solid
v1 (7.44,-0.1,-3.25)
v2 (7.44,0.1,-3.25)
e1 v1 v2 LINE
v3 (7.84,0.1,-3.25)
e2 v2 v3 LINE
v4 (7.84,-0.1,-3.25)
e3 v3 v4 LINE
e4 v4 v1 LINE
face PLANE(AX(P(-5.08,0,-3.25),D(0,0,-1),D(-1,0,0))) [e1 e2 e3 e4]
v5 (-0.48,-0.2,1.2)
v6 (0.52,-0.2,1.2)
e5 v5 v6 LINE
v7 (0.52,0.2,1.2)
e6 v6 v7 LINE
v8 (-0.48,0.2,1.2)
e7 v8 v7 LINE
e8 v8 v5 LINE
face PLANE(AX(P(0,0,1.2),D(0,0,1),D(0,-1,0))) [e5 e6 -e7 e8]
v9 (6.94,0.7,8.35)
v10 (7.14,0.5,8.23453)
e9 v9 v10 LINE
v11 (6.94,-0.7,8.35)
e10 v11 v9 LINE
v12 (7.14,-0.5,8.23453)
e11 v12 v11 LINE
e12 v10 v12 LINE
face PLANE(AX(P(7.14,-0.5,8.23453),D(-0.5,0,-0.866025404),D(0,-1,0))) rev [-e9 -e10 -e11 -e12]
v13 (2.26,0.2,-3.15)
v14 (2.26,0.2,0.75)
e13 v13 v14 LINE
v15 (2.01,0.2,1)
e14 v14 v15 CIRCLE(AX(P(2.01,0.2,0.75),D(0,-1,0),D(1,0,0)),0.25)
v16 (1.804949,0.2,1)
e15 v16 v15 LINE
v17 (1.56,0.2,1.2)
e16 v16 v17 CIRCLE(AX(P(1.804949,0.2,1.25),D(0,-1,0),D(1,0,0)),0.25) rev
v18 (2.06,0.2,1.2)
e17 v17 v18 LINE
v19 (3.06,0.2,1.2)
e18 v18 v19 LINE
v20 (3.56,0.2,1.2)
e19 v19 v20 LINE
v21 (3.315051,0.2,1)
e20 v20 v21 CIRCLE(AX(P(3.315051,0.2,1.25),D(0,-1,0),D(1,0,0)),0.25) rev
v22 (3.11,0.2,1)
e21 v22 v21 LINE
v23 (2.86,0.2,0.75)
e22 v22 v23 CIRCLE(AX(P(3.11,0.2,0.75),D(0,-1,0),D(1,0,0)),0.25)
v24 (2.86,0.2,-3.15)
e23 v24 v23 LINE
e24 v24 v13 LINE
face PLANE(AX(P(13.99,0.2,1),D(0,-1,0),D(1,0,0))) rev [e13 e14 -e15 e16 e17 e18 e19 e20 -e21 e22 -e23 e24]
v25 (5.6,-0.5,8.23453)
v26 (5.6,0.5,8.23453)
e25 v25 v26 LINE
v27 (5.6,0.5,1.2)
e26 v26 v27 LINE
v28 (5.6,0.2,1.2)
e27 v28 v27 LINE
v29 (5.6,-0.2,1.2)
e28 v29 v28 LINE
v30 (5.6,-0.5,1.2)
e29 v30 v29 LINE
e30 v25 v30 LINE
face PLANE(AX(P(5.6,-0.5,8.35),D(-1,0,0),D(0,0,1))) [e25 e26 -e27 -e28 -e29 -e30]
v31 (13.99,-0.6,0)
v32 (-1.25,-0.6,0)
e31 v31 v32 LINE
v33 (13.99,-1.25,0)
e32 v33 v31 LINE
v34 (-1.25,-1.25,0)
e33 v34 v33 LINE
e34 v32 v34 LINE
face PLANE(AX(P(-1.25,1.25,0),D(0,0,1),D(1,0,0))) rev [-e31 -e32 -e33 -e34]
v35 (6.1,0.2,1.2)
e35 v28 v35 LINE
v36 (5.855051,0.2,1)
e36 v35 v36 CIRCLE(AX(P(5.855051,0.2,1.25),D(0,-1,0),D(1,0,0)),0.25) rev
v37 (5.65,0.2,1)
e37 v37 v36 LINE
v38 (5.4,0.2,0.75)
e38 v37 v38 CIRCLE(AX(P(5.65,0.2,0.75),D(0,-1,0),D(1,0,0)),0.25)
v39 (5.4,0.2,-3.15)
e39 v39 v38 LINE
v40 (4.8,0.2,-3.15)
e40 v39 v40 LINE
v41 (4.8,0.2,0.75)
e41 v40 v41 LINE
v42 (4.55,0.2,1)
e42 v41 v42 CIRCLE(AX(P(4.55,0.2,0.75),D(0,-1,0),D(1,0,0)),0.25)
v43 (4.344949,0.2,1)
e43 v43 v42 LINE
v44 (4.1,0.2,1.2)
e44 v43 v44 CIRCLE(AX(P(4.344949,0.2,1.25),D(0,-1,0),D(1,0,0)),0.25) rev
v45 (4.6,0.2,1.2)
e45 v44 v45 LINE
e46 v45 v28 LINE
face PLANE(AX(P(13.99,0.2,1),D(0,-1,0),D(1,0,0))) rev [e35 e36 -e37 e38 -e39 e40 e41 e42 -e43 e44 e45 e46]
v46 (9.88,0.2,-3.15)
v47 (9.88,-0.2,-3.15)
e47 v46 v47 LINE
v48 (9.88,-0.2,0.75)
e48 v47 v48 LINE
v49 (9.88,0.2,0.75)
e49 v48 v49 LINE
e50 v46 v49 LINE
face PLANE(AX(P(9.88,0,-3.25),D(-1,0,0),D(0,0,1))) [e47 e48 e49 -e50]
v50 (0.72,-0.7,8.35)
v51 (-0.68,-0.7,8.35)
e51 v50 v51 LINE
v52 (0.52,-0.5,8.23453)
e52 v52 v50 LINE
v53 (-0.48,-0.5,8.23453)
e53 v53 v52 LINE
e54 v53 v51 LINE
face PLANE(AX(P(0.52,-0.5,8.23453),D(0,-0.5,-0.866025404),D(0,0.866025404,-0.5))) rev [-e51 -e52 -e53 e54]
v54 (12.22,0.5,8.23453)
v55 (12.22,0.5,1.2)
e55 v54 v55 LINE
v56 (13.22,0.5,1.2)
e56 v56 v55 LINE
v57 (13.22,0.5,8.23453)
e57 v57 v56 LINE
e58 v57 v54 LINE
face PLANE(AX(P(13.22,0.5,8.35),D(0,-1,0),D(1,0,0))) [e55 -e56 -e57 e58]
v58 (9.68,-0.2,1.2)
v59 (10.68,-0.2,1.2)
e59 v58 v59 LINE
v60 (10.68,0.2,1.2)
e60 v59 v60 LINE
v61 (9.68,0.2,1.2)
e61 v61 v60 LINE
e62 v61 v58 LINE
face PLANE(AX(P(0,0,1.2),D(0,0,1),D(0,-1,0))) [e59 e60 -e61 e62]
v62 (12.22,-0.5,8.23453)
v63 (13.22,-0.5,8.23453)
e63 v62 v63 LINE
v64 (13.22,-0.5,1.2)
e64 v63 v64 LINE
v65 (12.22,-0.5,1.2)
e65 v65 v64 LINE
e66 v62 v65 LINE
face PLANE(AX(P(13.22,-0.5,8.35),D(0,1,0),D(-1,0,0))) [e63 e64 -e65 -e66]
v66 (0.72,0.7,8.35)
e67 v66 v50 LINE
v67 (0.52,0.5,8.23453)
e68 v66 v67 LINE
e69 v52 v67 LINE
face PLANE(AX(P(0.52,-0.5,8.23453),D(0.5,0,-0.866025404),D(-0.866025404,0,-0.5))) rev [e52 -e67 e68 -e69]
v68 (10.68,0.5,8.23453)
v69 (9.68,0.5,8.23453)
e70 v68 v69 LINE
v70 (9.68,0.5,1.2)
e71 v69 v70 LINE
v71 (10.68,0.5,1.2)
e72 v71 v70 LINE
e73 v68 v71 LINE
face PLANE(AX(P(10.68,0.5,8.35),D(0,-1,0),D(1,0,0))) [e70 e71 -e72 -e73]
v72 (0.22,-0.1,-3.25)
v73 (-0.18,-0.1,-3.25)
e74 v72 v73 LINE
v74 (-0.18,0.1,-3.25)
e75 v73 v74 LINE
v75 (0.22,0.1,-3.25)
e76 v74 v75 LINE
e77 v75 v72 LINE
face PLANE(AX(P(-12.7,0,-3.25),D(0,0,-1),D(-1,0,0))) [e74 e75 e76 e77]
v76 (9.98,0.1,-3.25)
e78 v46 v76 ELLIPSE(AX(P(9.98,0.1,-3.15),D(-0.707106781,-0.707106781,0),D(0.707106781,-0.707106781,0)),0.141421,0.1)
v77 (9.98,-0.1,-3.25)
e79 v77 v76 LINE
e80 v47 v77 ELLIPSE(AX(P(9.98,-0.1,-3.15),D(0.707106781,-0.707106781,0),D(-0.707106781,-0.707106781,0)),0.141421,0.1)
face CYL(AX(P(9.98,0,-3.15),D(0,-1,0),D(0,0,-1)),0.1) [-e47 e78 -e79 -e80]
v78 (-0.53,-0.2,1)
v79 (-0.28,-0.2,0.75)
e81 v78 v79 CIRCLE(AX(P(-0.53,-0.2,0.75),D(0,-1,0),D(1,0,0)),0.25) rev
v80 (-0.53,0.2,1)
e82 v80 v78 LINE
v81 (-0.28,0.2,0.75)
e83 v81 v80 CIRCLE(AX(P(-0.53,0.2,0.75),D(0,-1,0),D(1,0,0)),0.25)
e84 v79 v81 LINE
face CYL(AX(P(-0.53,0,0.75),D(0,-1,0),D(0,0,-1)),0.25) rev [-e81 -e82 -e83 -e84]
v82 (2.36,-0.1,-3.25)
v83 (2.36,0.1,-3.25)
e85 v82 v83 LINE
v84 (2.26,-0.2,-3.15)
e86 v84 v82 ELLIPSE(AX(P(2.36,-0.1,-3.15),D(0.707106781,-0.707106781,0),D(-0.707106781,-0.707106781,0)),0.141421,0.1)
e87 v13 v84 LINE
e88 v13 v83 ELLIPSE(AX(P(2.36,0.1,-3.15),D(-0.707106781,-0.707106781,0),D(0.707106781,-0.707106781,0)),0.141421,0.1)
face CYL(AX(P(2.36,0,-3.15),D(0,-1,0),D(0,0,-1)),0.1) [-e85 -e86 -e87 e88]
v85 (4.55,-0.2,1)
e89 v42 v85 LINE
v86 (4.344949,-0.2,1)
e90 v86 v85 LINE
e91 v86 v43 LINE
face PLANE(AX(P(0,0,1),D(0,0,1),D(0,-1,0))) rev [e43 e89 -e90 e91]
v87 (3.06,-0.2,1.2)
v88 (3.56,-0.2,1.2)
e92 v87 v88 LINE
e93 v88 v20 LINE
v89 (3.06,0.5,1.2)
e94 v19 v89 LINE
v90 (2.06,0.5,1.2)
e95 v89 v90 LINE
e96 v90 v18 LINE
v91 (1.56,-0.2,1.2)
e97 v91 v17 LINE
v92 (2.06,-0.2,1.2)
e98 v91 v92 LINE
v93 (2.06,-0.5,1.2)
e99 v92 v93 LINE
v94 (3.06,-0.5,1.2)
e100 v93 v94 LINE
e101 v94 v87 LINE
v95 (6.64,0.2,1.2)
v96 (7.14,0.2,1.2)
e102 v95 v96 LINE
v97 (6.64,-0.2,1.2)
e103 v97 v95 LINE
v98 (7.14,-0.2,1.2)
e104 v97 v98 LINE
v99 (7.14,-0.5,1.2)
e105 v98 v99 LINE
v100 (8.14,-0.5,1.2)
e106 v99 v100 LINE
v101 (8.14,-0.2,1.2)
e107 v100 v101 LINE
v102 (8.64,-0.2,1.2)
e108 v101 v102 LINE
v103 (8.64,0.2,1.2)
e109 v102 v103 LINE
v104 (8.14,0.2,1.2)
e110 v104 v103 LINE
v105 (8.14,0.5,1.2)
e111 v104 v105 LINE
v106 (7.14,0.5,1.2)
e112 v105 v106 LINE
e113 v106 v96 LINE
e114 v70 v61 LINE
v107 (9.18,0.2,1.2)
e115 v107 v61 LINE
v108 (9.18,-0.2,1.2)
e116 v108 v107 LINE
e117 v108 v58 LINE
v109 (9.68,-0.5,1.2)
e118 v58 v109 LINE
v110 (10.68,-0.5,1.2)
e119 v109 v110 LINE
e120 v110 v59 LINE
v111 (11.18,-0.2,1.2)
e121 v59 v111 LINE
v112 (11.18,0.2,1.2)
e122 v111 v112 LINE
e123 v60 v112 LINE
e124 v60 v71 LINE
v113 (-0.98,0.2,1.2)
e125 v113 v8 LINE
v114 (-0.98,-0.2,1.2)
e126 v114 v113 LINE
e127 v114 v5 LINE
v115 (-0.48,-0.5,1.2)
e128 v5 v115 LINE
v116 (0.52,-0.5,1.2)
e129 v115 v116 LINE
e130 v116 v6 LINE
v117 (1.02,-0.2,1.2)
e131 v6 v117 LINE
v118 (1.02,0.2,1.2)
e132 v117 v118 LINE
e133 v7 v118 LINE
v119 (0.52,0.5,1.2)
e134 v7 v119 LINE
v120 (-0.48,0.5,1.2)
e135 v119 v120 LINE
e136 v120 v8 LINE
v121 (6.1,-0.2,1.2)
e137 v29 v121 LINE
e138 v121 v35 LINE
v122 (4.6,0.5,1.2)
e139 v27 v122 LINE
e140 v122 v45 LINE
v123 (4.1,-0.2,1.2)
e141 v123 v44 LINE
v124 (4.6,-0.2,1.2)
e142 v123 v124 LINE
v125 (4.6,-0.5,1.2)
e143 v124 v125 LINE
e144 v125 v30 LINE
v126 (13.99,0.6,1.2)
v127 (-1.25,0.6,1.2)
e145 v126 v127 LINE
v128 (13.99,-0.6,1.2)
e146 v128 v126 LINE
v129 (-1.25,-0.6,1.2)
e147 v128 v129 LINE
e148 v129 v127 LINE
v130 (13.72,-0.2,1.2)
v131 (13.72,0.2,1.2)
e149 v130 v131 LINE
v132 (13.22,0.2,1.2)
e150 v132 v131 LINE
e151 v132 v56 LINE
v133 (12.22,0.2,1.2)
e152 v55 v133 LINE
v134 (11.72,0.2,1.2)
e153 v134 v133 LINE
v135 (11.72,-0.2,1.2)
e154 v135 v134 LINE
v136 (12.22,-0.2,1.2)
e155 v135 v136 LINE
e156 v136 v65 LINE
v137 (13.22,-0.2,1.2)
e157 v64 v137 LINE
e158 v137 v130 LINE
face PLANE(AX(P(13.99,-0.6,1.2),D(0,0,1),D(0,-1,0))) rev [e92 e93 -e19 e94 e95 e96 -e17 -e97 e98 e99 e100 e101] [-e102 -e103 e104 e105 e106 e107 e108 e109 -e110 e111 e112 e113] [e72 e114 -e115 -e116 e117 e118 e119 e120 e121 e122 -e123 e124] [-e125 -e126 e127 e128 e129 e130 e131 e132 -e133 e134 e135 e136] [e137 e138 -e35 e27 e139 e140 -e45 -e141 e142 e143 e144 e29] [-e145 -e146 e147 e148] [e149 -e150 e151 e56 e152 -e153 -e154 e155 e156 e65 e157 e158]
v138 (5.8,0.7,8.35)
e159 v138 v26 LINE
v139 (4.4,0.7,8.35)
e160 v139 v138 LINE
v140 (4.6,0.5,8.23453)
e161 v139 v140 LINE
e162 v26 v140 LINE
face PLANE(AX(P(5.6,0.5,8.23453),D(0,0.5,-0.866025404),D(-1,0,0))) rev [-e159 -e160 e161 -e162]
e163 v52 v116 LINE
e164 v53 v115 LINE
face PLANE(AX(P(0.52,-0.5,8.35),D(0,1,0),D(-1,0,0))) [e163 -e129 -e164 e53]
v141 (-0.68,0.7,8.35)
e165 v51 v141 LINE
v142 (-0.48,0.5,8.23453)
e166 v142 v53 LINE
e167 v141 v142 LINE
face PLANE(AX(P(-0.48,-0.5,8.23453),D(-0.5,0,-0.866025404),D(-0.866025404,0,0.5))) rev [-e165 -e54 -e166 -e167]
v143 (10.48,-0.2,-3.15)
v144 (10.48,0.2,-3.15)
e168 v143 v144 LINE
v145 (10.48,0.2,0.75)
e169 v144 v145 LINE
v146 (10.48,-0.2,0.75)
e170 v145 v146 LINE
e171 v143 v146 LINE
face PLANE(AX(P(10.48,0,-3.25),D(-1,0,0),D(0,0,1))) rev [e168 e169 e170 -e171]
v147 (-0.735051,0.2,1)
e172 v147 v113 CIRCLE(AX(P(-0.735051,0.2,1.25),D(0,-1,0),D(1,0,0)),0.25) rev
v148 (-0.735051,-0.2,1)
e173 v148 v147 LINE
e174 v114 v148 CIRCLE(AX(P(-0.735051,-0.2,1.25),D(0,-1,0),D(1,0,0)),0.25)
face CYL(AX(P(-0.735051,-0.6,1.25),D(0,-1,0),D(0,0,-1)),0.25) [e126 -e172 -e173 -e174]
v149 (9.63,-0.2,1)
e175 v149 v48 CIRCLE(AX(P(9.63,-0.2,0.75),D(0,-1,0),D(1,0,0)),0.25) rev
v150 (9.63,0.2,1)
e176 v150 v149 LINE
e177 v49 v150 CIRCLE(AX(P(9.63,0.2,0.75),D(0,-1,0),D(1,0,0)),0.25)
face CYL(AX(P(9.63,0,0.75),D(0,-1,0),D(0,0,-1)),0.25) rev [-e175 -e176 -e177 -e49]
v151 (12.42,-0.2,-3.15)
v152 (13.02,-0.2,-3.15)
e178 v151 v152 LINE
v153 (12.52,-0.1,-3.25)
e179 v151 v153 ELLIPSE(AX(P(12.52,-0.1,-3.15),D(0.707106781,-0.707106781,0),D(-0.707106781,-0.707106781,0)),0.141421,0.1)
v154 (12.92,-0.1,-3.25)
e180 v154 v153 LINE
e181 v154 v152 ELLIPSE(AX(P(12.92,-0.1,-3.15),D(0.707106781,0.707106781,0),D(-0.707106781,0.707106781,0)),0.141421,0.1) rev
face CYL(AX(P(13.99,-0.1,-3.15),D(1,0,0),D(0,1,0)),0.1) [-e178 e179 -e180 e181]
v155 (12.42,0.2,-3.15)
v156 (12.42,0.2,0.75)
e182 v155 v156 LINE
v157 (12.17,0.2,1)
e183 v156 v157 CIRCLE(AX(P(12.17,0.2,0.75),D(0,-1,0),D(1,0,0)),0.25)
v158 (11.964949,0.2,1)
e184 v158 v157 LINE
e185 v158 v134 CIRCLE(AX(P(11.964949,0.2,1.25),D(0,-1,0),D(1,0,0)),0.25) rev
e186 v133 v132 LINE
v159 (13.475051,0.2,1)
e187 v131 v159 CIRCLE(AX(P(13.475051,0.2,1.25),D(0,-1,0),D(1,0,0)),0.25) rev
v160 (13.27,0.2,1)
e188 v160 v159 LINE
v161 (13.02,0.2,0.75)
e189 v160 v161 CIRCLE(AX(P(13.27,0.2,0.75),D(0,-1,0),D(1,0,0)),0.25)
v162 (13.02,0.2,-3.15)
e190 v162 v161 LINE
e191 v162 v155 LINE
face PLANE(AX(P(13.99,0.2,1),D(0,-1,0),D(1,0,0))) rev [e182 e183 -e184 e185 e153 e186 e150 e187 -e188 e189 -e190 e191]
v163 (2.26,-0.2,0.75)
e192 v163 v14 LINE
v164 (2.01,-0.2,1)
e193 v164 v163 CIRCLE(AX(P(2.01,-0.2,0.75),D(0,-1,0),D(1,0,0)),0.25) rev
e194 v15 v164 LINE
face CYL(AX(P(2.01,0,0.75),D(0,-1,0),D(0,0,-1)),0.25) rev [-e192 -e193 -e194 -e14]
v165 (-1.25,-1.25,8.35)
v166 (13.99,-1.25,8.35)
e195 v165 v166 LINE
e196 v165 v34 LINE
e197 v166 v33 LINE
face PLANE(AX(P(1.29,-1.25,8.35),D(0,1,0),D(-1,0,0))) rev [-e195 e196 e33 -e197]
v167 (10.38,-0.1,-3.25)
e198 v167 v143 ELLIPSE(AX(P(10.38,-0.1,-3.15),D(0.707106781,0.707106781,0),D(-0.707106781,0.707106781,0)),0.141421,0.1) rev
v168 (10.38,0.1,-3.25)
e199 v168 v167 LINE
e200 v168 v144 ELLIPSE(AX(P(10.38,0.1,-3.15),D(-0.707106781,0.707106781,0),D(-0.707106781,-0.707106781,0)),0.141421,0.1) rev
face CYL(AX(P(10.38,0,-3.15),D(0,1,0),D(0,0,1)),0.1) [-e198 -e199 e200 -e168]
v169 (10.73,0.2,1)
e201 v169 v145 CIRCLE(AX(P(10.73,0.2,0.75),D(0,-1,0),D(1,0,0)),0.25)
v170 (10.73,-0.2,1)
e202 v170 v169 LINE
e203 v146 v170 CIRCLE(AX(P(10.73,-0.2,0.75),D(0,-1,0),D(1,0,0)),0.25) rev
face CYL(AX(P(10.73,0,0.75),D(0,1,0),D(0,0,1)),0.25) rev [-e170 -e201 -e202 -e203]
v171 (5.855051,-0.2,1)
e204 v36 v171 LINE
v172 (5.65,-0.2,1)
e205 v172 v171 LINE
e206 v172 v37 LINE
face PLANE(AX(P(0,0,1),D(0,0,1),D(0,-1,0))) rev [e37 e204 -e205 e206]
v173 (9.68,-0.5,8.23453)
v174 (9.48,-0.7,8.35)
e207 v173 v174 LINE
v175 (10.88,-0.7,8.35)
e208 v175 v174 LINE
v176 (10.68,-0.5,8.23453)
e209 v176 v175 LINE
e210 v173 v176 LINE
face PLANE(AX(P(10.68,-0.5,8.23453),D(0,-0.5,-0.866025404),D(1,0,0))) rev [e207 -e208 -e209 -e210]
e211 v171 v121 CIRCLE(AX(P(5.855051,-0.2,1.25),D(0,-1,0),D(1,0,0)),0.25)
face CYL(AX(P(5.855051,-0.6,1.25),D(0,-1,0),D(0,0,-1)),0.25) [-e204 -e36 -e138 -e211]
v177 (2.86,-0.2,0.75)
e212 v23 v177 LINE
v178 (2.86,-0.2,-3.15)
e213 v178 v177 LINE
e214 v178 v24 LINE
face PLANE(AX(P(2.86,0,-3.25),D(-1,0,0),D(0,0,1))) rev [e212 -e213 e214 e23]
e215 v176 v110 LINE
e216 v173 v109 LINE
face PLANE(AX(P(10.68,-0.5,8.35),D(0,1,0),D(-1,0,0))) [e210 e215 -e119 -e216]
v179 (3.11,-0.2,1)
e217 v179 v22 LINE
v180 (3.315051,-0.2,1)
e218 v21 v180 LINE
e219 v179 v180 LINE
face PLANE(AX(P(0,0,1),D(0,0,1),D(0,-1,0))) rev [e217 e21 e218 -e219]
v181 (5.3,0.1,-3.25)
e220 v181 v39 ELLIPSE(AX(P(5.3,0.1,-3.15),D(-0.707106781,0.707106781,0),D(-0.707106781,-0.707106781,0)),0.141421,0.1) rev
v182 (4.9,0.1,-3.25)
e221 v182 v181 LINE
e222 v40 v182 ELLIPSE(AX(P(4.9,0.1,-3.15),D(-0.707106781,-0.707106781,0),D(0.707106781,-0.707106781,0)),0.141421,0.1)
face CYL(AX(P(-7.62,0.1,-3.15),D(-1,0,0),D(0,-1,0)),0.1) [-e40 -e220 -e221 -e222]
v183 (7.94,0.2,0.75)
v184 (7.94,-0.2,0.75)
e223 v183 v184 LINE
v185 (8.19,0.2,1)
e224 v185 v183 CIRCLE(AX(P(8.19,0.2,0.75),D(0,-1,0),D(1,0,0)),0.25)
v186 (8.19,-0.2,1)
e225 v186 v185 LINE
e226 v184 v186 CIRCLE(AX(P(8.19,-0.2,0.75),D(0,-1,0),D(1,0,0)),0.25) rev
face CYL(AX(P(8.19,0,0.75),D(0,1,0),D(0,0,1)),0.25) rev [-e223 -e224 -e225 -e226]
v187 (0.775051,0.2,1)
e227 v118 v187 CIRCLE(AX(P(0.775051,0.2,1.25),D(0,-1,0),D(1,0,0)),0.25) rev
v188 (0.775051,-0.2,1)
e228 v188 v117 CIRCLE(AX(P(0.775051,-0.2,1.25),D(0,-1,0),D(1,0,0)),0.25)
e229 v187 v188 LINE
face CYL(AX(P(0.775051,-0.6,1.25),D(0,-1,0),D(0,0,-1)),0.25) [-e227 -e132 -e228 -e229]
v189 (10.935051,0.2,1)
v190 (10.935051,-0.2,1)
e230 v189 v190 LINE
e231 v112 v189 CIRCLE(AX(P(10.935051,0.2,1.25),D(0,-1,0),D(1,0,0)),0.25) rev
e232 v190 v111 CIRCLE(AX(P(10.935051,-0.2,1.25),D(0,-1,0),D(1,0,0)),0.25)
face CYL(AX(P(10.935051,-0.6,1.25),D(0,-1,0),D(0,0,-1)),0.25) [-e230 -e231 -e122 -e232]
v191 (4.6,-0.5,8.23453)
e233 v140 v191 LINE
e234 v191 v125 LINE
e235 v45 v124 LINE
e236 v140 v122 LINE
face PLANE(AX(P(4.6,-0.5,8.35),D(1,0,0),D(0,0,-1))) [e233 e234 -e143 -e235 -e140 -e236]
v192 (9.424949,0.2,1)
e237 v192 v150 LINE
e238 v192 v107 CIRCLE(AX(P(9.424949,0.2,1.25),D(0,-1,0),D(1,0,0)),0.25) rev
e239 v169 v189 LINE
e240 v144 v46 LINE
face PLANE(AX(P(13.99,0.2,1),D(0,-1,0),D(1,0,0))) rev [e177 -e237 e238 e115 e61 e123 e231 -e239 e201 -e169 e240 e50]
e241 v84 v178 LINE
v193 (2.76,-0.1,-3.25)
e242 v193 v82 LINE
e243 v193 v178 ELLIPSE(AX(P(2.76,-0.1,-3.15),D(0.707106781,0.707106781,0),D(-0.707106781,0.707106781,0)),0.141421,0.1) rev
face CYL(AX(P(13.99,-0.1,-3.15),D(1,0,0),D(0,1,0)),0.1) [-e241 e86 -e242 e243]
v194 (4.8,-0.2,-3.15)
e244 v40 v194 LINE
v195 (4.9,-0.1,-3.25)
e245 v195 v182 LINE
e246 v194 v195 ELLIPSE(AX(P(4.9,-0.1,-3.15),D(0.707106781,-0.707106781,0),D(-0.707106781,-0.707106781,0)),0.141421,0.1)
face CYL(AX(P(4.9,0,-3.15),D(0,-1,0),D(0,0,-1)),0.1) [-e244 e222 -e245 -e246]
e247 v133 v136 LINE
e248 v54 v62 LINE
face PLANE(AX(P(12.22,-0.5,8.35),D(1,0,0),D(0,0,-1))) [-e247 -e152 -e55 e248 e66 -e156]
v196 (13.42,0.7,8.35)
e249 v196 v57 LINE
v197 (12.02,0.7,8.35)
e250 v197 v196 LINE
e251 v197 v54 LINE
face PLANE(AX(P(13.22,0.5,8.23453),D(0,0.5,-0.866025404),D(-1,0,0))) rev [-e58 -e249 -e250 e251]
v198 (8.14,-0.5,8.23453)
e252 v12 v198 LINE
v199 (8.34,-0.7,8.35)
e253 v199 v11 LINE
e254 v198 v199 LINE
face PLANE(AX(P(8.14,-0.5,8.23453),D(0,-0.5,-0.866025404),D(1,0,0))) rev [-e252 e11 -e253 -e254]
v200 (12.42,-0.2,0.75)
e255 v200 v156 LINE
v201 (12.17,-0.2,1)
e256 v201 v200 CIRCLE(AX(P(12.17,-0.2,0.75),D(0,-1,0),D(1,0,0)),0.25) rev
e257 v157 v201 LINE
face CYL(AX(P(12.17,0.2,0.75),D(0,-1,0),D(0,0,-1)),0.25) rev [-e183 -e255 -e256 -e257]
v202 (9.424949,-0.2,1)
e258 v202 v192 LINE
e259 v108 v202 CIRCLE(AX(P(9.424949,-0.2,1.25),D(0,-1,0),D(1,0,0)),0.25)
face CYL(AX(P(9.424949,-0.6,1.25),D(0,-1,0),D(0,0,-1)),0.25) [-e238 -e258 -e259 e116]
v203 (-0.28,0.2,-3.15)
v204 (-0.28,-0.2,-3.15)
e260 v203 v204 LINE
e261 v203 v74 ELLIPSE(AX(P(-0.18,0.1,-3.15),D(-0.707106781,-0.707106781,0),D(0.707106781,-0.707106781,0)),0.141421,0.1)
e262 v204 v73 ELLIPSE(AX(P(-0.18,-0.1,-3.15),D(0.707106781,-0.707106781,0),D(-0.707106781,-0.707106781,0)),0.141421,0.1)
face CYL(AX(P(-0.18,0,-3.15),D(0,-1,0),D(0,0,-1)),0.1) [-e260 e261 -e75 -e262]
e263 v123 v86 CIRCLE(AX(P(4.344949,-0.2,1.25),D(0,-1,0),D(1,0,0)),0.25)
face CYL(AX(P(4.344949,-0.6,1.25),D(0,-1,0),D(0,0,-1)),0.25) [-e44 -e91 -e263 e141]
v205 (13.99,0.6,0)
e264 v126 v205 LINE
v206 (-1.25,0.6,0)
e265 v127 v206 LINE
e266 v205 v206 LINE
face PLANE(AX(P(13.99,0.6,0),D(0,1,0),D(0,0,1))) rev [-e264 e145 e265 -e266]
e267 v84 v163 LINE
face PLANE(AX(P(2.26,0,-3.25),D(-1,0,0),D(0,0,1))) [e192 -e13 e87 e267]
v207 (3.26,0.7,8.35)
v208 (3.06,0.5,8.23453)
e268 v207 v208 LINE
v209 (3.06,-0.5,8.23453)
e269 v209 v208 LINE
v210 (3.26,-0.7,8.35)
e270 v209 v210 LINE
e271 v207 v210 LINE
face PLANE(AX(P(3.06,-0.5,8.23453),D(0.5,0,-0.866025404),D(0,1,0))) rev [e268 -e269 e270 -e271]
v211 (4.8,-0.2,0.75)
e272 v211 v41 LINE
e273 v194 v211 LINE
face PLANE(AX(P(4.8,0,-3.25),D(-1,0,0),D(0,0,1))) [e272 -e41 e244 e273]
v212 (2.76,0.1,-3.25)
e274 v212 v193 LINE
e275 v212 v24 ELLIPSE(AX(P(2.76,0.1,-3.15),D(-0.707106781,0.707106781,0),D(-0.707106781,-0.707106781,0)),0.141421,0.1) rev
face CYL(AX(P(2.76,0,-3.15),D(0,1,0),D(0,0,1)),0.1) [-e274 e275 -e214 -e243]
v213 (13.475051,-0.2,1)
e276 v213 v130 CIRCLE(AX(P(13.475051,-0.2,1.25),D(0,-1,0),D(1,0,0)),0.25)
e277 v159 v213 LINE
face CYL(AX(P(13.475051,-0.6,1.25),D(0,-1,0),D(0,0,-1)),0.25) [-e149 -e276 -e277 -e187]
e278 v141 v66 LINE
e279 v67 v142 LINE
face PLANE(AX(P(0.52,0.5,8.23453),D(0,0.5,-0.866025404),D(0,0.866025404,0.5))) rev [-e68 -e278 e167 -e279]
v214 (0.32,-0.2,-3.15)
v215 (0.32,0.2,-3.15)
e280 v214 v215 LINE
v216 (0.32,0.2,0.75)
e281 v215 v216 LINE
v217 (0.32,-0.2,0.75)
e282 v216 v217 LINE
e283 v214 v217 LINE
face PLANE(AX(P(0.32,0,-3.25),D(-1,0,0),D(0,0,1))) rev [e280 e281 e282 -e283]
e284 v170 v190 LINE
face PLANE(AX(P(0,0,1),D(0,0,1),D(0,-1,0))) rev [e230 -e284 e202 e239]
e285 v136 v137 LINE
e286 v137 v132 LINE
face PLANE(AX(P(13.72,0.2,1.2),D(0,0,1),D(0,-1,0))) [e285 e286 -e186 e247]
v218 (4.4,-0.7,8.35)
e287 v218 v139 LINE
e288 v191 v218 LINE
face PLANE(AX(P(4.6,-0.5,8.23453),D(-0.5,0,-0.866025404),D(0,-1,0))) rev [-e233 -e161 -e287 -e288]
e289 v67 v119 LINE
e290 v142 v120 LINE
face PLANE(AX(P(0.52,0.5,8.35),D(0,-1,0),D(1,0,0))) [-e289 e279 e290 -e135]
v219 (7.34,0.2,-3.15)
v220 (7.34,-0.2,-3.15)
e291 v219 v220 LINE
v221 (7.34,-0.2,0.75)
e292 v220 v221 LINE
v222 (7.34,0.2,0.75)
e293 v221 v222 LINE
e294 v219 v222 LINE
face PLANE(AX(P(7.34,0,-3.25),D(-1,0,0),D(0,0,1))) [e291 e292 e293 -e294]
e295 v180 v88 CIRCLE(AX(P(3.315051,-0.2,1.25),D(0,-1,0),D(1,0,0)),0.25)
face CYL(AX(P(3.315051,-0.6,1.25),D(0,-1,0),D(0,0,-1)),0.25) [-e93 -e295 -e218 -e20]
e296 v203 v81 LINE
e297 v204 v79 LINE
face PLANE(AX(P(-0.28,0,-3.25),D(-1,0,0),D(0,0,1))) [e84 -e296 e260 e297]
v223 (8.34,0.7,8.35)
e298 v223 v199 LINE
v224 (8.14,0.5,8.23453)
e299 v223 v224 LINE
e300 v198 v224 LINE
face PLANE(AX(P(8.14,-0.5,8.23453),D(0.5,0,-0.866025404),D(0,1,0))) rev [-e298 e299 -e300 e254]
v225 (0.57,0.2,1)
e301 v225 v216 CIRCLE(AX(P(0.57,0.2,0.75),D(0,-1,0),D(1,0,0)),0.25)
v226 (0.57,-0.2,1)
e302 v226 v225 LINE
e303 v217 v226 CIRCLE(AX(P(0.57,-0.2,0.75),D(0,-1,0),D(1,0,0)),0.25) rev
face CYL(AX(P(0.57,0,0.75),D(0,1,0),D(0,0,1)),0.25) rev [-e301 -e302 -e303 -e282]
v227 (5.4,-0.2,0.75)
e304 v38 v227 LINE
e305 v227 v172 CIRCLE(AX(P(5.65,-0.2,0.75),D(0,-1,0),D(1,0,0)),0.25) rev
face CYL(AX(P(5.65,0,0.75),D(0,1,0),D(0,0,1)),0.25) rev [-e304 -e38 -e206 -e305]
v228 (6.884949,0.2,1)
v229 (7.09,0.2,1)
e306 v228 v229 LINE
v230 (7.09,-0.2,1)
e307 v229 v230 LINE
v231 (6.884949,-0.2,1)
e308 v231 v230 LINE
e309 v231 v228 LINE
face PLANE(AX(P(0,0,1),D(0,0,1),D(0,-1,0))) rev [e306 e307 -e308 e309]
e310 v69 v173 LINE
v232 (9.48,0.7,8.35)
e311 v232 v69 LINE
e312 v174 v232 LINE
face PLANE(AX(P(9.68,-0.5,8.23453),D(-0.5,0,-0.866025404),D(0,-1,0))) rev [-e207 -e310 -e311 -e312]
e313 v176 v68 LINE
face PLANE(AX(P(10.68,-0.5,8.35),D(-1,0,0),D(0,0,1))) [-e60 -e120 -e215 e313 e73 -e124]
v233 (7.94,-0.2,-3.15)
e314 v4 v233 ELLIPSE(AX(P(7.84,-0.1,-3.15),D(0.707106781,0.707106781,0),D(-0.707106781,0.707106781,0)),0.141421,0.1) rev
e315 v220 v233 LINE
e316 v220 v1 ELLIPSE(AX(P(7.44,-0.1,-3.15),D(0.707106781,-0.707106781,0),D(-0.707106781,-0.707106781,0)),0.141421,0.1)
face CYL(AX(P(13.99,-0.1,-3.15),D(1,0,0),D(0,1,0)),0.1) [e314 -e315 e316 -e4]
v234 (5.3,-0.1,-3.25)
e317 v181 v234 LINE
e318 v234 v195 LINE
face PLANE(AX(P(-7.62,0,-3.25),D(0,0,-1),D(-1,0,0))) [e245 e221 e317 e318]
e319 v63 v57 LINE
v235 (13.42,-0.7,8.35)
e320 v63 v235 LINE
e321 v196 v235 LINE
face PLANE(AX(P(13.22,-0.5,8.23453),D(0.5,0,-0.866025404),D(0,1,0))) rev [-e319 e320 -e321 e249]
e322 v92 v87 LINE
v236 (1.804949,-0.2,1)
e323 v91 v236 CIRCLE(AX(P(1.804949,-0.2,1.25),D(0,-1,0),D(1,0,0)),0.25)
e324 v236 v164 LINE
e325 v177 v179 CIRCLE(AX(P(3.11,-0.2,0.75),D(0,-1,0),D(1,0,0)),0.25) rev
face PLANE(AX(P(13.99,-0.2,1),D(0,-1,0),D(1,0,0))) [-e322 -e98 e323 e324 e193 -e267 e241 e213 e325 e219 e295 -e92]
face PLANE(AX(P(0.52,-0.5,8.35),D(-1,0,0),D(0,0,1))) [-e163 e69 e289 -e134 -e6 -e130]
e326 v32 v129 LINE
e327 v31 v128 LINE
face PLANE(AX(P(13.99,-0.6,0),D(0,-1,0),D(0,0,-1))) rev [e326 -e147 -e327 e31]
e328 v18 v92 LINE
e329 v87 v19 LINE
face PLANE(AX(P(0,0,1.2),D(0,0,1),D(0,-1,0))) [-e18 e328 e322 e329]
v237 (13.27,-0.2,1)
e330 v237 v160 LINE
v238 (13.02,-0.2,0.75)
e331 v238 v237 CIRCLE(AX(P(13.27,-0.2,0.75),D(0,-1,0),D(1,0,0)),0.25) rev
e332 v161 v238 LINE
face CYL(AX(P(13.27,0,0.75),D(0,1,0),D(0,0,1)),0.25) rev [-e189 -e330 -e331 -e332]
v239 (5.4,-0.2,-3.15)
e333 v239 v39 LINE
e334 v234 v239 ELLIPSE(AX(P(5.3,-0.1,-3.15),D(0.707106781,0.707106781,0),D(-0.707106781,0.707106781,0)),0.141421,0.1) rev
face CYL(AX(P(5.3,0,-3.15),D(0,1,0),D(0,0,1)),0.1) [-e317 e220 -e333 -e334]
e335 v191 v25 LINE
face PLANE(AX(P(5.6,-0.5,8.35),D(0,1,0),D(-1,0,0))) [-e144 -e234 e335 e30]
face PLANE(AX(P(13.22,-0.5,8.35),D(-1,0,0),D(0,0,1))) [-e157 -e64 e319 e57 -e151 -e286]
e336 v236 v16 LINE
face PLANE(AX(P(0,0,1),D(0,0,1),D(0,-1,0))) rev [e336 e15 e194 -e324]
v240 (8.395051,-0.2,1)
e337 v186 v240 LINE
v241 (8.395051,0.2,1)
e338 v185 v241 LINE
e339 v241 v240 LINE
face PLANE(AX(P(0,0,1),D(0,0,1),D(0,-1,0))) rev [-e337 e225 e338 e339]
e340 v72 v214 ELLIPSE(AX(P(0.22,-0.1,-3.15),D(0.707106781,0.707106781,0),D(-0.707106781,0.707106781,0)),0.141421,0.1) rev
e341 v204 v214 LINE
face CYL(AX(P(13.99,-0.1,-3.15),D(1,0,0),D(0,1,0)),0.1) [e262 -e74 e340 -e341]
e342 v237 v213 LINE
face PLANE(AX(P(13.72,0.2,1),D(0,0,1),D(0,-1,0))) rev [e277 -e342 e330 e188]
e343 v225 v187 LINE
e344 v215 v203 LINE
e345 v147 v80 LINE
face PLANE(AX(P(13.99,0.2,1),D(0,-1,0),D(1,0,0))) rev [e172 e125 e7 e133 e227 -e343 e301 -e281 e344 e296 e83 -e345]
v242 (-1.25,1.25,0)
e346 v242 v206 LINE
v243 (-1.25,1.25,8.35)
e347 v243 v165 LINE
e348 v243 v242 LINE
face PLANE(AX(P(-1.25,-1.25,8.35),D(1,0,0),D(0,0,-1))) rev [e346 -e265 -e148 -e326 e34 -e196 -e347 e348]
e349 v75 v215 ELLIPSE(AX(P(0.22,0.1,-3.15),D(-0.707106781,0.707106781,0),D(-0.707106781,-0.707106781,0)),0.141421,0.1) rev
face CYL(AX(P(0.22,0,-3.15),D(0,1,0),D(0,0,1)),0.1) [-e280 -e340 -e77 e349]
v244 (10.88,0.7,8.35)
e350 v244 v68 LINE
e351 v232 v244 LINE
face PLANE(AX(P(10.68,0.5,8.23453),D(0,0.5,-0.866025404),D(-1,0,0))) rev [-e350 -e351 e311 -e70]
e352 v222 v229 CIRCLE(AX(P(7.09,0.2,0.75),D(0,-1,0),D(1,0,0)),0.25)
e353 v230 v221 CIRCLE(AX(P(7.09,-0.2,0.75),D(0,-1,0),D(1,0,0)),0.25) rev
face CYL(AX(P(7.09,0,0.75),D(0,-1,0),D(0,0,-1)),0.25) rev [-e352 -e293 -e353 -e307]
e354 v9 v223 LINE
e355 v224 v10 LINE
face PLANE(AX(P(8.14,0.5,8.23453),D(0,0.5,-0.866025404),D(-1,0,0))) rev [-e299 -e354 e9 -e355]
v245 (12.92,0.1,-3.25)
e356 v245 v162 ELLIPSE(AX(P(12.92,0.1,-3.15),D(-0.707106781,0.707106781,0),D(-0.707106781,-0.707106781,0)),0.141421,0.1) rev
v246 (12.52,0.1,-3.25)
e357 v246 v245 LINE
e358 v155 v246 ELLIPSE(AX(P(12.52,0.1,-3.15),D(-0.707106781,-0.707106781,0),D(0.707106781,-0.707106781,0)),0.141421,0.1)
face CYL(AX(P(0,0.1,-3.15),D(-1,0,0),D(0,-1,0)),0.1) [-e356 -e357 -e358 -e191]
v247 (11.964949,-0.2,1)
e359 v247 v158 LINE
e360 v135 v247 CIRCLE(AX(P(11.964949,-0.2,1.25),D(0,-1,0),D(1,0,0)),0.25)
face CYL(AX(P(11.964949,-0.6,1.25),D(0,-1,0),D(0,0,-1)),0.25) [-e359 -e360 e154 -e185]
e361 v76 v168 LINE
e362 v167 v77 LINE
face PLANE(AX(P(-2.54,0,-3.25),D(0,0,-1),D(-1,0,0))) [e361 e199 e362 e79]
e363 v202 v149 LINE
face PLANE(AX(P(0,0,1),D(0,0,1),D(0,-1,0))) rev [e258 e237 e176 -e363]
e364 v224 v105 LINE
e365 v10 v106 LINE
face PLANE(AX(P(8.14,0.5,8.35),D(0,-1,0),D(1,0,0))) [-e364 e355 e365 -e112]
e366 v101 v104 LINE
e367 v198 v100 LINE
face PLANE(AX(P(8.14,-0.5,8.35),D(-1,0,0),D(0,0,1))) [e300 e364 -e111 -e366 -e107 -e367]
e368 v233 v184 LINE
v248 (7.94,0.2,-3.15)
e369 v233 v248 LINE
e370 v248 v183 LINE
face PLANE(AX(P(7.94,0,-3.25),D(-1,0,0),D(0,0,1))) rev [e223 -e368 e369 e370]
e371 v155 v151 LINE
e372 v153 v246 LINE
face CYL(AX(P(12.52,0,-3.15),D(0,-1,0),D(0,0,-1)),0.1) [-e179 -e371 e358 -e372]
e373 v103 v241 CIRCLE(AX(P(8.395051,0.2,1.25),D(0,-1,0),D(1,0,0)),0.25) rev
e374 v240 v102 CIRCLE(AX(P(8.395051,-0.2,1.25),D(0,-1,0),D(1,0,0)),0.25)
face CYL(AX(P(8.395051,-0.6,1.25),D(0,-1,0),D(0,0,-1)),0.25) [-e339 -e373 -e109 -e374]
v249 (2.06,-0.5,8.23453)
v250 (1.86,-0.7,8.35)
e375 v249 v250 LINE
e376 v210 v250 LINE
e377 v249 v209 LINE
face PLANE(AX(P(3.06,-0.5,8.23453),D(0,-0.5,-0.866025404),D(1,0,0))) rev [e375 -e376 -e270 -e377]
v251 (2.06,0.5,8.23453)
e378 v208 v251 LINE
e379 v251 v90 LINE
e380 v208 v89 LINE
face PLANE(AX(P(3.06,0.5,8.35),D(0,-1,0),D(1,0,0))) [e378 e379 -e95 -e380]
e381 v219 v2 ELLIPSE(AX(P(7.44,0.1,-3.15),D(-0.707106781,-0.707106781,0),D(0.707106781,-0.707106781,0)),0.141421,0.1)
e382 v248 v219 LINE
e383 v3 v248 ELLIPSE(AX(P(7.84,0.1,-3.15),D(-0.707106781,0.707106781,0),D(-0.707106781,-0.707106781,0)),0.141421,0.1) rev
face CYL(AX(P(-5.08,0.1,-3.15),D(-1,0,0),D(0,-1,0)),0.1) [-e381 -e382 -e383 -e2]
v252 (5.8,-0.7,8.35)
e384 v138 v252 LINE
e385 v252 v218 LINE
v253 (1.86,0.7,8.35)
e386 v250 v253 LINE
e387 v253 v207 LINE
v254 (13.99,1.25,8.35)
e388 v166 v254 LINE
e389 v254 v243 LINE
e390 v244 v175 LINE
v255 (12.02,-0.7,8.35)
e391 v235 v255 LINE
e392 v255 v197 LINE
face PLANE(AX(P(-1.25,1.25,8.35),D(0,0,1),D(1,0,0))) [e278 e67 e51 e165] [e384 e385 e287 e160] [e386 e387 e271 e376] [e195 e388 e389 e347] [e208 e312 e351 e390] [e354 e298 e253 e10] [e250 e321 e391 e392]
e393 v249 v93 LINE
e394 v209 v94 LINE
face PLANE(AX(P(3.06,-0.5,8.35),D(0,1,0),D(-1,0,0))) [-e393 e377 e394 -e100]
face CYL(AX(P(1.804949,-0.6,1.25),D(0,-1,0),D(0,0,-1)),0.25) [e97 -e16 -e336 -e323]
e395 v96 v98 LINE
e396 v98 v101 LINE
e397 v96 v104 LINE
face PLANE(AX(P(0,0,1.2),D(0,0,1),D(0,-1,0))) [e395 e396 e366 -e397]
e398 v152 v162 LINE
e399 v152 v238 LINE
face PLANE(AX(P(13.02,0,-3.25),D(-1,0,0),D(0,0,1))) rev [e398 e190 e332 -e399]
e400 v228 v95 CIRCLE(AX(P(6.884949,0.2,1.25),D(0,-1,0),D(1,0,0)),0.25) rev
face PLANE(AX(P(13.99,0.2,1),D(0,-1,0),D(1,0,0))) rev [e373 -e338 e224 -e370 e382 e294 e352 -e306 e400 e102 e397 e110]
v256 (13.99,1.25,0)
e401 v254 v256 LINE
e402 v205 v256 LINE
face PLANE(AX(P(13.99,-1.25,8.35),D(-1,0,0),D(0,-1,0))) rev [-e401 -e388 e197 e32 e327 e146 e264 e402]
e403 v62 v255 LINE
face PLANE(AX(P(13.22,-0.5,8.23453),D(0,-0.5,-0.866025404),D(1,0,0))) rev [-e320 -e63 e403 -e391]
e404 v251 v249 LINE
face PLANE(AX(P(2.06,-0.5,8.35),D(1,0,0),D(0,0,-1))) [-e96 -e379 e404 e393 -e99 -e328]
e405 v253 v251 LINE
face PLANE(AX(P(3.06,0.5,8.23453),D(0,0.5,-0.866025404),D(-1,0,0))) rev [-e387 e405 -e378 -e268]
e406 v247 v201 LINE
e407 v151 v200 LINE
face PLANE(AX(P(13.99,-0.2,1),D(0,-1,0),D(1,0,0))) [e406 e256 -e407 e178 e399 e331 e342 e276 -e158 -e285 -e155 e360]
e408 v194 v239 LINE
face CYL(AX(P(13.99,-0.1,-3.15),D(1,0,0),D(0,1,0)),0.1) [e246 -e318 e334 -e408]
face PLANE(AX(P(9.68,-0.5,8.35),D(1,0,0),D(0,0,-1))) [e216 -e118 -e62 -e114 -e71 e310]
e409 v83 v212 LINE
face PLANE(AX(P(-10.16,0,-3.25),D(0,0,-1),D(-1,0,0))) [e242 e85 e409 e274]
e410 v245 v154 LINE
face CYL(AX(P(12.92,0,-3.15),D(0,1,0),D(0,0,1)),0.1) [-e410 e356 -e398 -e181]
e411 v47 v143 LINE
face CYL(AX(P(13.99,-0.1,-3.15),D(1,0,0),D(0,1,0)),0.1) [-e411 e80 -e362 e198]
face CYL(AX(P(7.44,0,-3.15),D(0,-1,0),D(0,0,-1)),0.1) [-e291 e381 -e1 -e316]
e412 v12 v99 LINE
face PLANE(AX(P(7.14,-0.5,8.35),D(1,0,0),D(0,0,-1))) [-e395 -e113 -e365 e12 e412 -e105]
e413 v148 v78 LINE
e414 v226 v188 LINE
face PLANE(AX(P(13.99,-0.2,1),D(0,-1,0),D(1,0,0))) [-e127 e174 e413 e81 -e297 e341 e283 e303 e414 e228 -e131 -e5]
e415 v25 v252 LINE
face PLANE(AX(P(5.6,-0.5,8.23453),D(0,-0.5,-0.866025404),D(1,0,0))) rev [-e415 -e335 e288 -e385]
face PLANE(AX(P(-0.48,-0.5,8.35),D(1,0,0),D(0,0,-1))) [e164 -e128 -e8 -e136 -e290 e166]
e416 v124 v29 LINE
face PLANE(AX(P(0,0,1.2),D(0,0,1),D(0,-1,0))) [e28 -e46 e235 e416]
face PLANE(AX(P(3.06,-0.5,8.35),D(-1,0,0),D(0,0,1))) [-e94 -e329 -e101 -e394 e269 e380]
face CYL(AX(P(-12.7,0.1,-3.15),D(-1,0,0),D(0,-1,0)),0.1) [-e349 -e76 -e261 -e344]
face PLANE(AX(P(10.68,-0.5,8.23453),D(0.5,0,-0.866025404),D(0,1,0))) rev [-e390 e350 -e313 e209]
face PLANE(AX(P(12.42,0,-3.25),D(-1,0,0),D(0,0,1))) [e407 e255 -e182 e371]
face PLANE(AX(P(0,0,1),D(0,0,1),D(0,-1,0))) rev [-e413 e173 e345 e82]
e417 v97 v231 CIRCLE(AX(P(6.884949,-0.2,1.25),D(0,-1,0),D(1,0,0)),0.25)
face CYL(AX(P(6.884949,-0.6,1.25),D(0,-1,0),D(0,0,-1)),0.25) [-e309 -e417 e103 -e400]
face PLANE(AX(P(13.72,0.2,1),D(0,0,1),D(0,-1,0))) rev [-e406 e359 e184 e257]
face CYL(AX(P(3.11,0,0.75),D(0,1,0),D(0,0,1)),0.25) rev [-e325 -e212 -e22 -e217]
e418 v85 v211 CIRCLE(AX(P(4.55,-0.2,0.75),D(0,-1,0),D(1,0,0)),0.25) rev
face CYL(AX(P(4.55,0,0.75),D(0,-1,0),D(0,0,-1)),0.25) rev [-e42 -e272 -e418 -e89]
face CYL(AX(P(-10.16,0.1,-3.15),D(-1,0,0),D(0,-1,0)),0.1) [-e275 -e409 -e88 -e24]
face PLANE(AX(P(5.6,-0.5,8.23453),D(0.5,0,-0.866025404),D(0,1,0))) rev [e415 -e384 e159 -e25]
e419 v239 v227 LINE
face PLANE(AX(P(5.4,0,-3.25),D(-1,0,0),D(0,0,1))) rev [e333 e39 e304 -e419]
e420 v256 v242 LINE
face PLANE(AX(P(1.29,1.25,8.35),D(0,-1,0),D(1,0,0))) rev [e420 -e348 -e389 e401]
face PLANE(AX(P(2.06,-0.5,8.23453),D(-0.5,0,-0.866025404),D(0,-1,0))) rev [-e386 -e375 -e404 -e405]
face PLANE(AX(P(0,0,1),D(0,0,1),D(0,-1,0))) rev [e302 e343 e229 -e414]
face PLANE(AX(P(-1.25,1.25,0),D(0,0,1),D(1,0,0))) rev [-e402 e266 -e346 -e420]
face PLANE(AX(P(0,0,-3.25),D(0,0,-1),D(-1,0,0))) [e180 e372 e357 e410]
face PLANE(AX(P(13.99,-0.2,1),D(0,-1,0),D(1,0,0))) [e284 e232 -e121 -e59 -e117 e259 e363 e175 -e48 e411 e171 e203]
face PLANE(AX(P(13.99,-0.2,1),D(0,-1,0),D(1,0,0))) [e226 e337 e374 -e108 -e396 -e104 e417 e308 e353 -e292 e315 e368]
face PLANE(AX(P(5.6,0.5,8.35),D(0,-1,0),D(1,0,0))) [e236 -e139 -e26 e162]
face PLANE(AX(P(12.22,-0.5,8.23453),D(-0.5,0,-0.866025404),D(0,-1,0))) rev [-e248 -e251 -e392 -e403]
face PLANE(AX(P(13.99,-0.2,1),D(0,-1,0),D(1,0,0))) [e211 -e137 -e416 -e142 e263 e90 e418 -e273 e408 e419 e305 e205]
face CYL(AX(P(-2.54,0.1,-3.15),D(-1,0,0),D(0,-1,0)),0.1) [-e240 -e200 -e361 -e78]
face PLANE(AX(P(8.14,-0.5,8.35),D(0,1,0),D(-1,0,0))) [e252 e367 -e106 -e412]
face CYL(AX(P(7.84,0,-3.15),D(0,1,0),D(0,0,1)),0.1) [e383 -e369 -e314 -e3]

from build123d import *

# Parameters (mm, degrees)
SKETCH1_W                   = 2.54
SKETCH1_H                   = 2.5
SKETCH1_W_2                 = 1
SKETCH1_H_2                 = 1
BOSS_EXTRUDE1_DEPTH         = 8.35
CHAMFER1_SIZE               = 0.2
CHAMFER1_SIZE2              = 0.115470054
LPATTERN2_COUNT             = 6
LPATTERN2_PITCH             = 2.54
CHAMFER1_OF_LPATTERN2_SIZE2 = 0.115470054
CHAMFER1_OF_LPATTERN2_SIZE  = 0.2
SKETCH4_W                   = 1.2
SKETCH4_H                   = 1.2
CUT_EXTRUDE1_DEPTH          = 18.422473992
SKETCH3_W                   = 0.7
SKETCH3_H                   = 0.4
SKETCH3_W_2                 = 0.6
BOSS_EXTRUDE2_DEPTH         = 0.2
SKETCH3_3_W                 = 0.6
SKETCH3_3_H                 = 0.4
BOSS_EXTRUDE3_DEPTH         = 4.45
FILLET1_R                   = 0.1
FILLET2_R                   = 0.25
LPATTERN3_START             = -0.2
LPATTERN3_DEPTH             = 0.4
LPATTERN3_START_2           = -1
LPATTERN3_2_DEPTH           = 12


with BuildPart() as part:
    # Sketch1 → Boss-Extrude1 (new body)
    with BuildSketch(Plane.XY):
        with Locations((0.02, 0)):
            Rectangle(SKETCH1_W, SKETCH1_H)
        with Locations((0.02, 0)):
            Rectangle(SKETCH1_W_2, SKETCH1_H_2, mode=Mode.SUBTRACT)
    boss_extrude1 = extrude(amount=BOSS_EXTRUDE1_DEPTH)

    # Chamfer1
    chamfer1_edges = [part.edges().sort_by_distance(p)[0] for p in [
        (-0.48, 0, 8.35),
        (0.02, -0.5, 8.35),
        (0.52, 0, 8.35),
        (0.02, 0.5, 8.35),
    ]]
    chamfer1_side = [part.faces().sort_by_distance(p)[0] for p in [
        (0.02, -1.214360696, 8.35),
    ]]
    chamfer(chamfer1_edges, length=CHAMFER1_SIZE, length2=CHAMFER1_SIZE2, reference=chamfer1_side[0])

    # LPattern2: Boss-Extrude1 ×6
    with Locations(*[(i * LPATTERN2_PITCH, 0, 0) for i in range(1, LPATTERN2_COUNT)]):
        add(boss_extrude1)

    # Chamfer1 of LPattern2
    chamfer1_of_lpattern2_edges = [part.edges().sort_by_distance(p)[0] for p in [
        (2.06, 0, 8.35),
        (2.56, -0.5, 8.35),
        (3.06, 0, 8.35),
        (2.56, 0.5, 8.35),
        (4.6, 0, 8.35),
        (5.1, -0.5, 8.35),
        (5.6, 0, 8.35),
        (5.1, 0.5, 8.35),
        (7.14, 0, 8.35),
        (7.64, -0.5, 8.35),
        (8.14, 0, 8.35),
        (7.64, 0.5, 8.35),
        (9.68, 0, 8.35),
        (10.18, -0.5, 8.35),
        (10.68, 0, 8.35),
        (10.18, 0.5, 8.35),
        (12.22, 0, 8.35),
        (12.72, -0.5, 8.35),
        (13.22, 0, 8.35),
        (12.72, 0.5, 8.35),
    ]]
    chamfer(chamfer1_of_lpattern2_edges, length=CHAMFER1_OF_LPATTERN2_SIZE, length2=CHAMFER1_OF_LPATTERN2_SIZE2)

    # Sketch4 → Cut-Extrude1 (cut, through all)
    with BuildSketch(Plane.ZY.offset(1.25)):
        with Locations((0.6, 0)):
            Rectangle(SKETCH4_W, SKETCH4_H)
    extrude(amount=-CUT_EXTRUDE1_DEPTH, mode=Mode.SUBTRACT)

    # Sketch3 → Boss-Extrude2 (add)
    with BuildSketch(Plane(origin=(0, 0, 1.2), x_dir=(-1, 0, 0), z_dir=(0, 0, -1))):
        with Locations((-13.37, 0)):
            Rectangle(SKETCH3_W, SKETCH3_H)
        with Locations((-12.07, 0)):
            Rectangle(SKETCH3_W, SKETCH3_H)
        with Locations((-12.72, 0)):
            Rectangle(SKETCH3_W_2, SKETCH3_H)
    extrude(amount=BOSS_EXTRUDE2_DEPTH)

    # Sketch3<3> → Boss-Extrude3 (add)
    with BuildSketch(Plane(origin=(0, 0, 1.2), x_dir=(-1, 0, 0), z_dir=(0, 0, -1))):
        with Locations((-12.72, 0)):
            Rectangle(SKETCH3_3_W, SKETCH3_3_H)
    extrude(amount=BOSS_EXTRUDE3_DEPTH)

    # Fillet1
    fillet1_edges = [part.edges().sort_by_distance(p)[0] for p in [
        (12.42, 0, -3.25),
        (12.72, -0.2, -3.25),
        (12.72, 0.2, -3.25),
        (13.02, 0, -3.25),
    ]]
    fillet(fillet1_edges, radius=FILLET1_R)

    # Fillet2
    # the kernel refuses this fillet: 0.25 mm, written as the material it adds along each edge
    with BuildSketch(Plane(origin=(13.02, -0.2, 1), x_dir=(0, 0, -1), z_dir=(0, 1, 0)), Plane(origin=(12.42, 0.2, 1), x_dir=(0, 0, -1), z_dir=(0, -1, 0))) as fillet2_piece_1:
        with BuildLine():
            CenterArc((FILLET2_R, -FILLET2_R), FILLET2_R, 90, 90)
            Line((0, -FILLET2_R), (0, 0))
            Line((0, 0), (FILLET2_R, 0))
        make_face()
    extrude(amount=0.4)
    # the kernel refuses this fillet: 0.25 mm, written as the material it takes off along each edge
    with BuildSketch(Plane(origin=(11.72, -0.812372436, 1), x_dir=(1, 0, 0), z_dir=(0, 1, 0))) as fillet2_2_piece_1_section:
        with BuildLine():
            CenterArc((0.244948974, -0.25), FILLET2_R, 90, 78.463040967)
            Line((0, -0.2), (0, 0))
            Line((0, 0), (0.244948974, 0))
        make_face()
    fillet2_2_piece_1 = extrude(amount=1.624744871, mode=Mode.PRIVATE)
    fillet2_2_piece_1 = split(fillet2_2_piece_1, bisect_by=Plane(origin=(11.72, -0.6, 1), z_dir=(0, 1, 0)), keep=Keep.TOP, mode=Mode.PRIVATE)
    fillet2_2_piece_1 = split(fillet2_2_piece_1, bisect_by=Plane(origin=(11.72, 0.6, 1), z_dir=(0, -1, 0)), keep=Keep.TOP, mode=Mode.PRIVATE)
    add(fillet2_2_piece_1, mode=Mode.SUBTRACT)
    with BuildSketch(Plane(origin=(13.72, 0.812372436, 1), x_dir=(-1, 0, 0), z_dir=(0, -1, 0))) as fillet2_2_piece_2_section:
        with BuildLine():
            CenterArc((0.244948974, -0.25), FILLET2_R, 90, 78.463040967)
            Line((0, -0.2), (0, 0))
            Line((0, 0), (0.244948974, 0))
        make_face()
    fillet2_2_piece_2 = extrude(amount=1.624744871, mode=Mode.PRIVATE)
    fillet2_2_piece_2 = split(fillet2_2_piece_2, bisect_by=Plane(origin=(13.72, -0.6, 1), z_dir=(0, 1, 0)), keep=Keep.TOP, mode=Mode.PRIVATE)
    fillet2_2_piece_2 = split(fillet2_2_piece_2, bisect_by=Plane(origin=(13.72, 0.6, 1), z_dir=(0, -1, 0)), keep=Keep.TOP, mode=Mode.PRIVATE)
    add(fillet2_2_piece_2, mode=Mode.SUBTRACT)

    # LPattern3: read off the stored shape, not the designer's step
    # LPattern3 outline → LPattern3 (add)
    with BuildSketch(Plane(origin=(0, 0, 0), x_dir=(1, 0, 0), z_dir=(0, 1, 0)).offset(LPATTERN3_START)):
        with BuildLine():
            ThreePointArc((9.424948974, -1), (9.266835091, -1.056350833), (9.18, -1.2))
            Line((9.18, -1.2), (11.18, -1.2))
            ThreePointArc((11.18, -1.2), (11.093164909, -1.056350833), (10.935051026, -1))
            Line((10.935051026, -1), (10.73, -1))
            ThreePointArc((10.73, -1), (10.553223305, -0.926776695), (10.48, -0.75))
            Line((10.48, -0.75), (10.48, 3.15))
            ThreePointArc((10.48, 3.15), (10.450710678, 3.220710678), (10.38, 3.25))
            Line((10.38, 3.25), (9.98, 3.25))
            ThreePointArc((9.98, 3.25), (9.909289322, 3.220710678), (9.88, 3.15))
            Line((9.88, 3.15), (9.88, -0.75))
            ThreePointArc((9.88, -0.75), (9.806776695, -0.926776695), (9.63, -1))
            Line((9.63, -1), (9.424948974, -1))
        make_face()
        with BuildLine():
            ThreePointArc((6.884948974, -1), (6.726835091, -1.056350833), (6.64, -1.2))
            Line((6.64, -1.2), (8.64, -1.2))
            ThreePointArc((8.64, -1.2), (8.553164909, -1.056350833), (8.395051026, -1))
            Line((8.395051026, -1), (8.19, -1))
            ThreePointArc((8.19, -1), (8.013223305, -0.926776695), (7.94, -0.75))
            Line((7.94, -0.75), (7.94, 3.15))
            ThreePointArc((7.94, 3.15), (7.910710678, 3.220710678), (7.84, 3.25))
            Line((7.84, 3.25), (7.44, 3.25))
            ThreePointArc((7.44, 3.25), (7.369289322, 3.220710678), (7.34, 3.15))
            Line((7.34, 3.15), (7.34, -0.75))
            ThreePointArc((7.34, -0.75), (7.266776695, -0.926776695), (7.09, -1))
            Line((7.09, -1), (6.884948974, -1))
        make_face()
        with BuildLine():
            ThreePointArc((4.344948974, -1), (4.186835091, -1.056350833), (4.1, -1.2))
            Line((4.1, -1.2), (6.1, -1.2))
            ThreePointArc((6.1, -1.2), (6.013164909, -1.056350833), (5.855051026, -1))
            Line((5.855051026, -1), (5.65, -1))
            ThreePointArc((5.65, -1), (5.473223305, -0.926776695), (5.4, -0.75))
            Line((5.4, -0.75), (5.4, 3.15))
            ThreePointArc((5.4, 3.15), (5.370710678, 3.220710678), (5.3, 3.25))
            Line((5.3, 3.25), (4.9, 3.25))
            ThreePointArc((4.9, 3.25), (4.829289322, 3.220710678), (4.8, 3.15))
            Line((4.8, 3.15), (4.8, -0.75))
            ThreePointArc((4.8, -0.75), (4.726776695, -0.926776695), (4.55, -1))
            Line((4.55, -1), (4.344948974, -1))
        make_face()
        with BuildLine():
            ThreePointArc((1.804948974, -1), (1.646835091, -1.056350833), (1.56, -1.2))
            Line((1.56, -1.2), (3.56, -1.2))
            ThreePointArc((3.56, -1.2), (3.473164909, -1.056350833), (3.315051026, -1))
            Line((3.315051026, -1), (3.11, -1))
            ThreePointArc((3.11, -1), (2.933223305, -0.926776695), (2.86, -0.75))
            Line((2.86, -0.75), (2.86, 3.15))
            ThreePointArc((2.86, 3.15), (2.830710678, 3.220710678), (2.76, 3.25))
            Line((2.76, 3.25), (2.36, 3.25))
            ThreePointArc((2.36, 3.25), (2.289289322, 3.220710678), (2.26, 3.15))
            Line((2.26, 3.15), (2.26, -0.75))
            ThreePointArc((2.26, -0.75), (2.186776695, -0.926776695), (2.01, -1))
            Line((2.01, -1), (1.804948974, -1))
        make_face()
        with BuildLine():
            Line((0.775051026, -1), (0.57, -1))
            ThreePointArc((0.57, -1), (0.393223305, -0.926776695), (0.32, -0.75))
            Line((0.32, -0.75), (0.32, 3.15))
            ThreePointArc((0.32, 3.15), (0.290710678, 3.220710678), (0.22, 3.25))
            Line((0.22, 3.25), (-0.18, 3.25))
            ThreePointArc((-0.18, 3.25), (-0.250710678, 3.220710678), (-0.28, 3.15))
            Line((-0.28, 3.15), (-0.28, -0.75))
            ThreePointArc((-0.28, -0.75), (-0.353223305, -0.926776695), (-0.53, -1))
            Line((-0.53, -1), (-0.735051026, -1))
            ThreePointArc((-0.735051026, -1), (-0.893164909, -1.056350833), (-0.98, -1.2))
            Line((-0.98, -1.2), (1.02, -1.2))
            ThreePointArc((1.02, -1.2), (0.933164909, -1.056350833), (0.775051026, -1))
        make_face()
    extrude(amount=LPATTERN3_DEPTH)

    # LPattern3 2 outline → LPattern3 2 (cut)
    with BuildSketch(Plane.YZ.offset(LPATTERN3_START_2)):
        with BuildLine():
            Line((0.2, -3.25), (0.2, -3.15))
            ThreePointArc((0.2, -3.15), (0.170710678, -3.220710678), (0.1, -3.25))
            Line((0.1, -3.25), (0.2, -3.25))
        make_face()
        with BuildLine():
            Line((-0.2, -3.25), (-0.1, -3.25))
            ThreePointArc((-0.1, -3.25), (-0.170710678, -3.220710678), (-0.2, -3.15))
            Line((-0.2, -3.15), (-0.2, -3.25))
        make_face()
    extrude(amount=LPATTERN3_2_DEPTH, mode=Mode.SUBTRACT)


solid = part.part
